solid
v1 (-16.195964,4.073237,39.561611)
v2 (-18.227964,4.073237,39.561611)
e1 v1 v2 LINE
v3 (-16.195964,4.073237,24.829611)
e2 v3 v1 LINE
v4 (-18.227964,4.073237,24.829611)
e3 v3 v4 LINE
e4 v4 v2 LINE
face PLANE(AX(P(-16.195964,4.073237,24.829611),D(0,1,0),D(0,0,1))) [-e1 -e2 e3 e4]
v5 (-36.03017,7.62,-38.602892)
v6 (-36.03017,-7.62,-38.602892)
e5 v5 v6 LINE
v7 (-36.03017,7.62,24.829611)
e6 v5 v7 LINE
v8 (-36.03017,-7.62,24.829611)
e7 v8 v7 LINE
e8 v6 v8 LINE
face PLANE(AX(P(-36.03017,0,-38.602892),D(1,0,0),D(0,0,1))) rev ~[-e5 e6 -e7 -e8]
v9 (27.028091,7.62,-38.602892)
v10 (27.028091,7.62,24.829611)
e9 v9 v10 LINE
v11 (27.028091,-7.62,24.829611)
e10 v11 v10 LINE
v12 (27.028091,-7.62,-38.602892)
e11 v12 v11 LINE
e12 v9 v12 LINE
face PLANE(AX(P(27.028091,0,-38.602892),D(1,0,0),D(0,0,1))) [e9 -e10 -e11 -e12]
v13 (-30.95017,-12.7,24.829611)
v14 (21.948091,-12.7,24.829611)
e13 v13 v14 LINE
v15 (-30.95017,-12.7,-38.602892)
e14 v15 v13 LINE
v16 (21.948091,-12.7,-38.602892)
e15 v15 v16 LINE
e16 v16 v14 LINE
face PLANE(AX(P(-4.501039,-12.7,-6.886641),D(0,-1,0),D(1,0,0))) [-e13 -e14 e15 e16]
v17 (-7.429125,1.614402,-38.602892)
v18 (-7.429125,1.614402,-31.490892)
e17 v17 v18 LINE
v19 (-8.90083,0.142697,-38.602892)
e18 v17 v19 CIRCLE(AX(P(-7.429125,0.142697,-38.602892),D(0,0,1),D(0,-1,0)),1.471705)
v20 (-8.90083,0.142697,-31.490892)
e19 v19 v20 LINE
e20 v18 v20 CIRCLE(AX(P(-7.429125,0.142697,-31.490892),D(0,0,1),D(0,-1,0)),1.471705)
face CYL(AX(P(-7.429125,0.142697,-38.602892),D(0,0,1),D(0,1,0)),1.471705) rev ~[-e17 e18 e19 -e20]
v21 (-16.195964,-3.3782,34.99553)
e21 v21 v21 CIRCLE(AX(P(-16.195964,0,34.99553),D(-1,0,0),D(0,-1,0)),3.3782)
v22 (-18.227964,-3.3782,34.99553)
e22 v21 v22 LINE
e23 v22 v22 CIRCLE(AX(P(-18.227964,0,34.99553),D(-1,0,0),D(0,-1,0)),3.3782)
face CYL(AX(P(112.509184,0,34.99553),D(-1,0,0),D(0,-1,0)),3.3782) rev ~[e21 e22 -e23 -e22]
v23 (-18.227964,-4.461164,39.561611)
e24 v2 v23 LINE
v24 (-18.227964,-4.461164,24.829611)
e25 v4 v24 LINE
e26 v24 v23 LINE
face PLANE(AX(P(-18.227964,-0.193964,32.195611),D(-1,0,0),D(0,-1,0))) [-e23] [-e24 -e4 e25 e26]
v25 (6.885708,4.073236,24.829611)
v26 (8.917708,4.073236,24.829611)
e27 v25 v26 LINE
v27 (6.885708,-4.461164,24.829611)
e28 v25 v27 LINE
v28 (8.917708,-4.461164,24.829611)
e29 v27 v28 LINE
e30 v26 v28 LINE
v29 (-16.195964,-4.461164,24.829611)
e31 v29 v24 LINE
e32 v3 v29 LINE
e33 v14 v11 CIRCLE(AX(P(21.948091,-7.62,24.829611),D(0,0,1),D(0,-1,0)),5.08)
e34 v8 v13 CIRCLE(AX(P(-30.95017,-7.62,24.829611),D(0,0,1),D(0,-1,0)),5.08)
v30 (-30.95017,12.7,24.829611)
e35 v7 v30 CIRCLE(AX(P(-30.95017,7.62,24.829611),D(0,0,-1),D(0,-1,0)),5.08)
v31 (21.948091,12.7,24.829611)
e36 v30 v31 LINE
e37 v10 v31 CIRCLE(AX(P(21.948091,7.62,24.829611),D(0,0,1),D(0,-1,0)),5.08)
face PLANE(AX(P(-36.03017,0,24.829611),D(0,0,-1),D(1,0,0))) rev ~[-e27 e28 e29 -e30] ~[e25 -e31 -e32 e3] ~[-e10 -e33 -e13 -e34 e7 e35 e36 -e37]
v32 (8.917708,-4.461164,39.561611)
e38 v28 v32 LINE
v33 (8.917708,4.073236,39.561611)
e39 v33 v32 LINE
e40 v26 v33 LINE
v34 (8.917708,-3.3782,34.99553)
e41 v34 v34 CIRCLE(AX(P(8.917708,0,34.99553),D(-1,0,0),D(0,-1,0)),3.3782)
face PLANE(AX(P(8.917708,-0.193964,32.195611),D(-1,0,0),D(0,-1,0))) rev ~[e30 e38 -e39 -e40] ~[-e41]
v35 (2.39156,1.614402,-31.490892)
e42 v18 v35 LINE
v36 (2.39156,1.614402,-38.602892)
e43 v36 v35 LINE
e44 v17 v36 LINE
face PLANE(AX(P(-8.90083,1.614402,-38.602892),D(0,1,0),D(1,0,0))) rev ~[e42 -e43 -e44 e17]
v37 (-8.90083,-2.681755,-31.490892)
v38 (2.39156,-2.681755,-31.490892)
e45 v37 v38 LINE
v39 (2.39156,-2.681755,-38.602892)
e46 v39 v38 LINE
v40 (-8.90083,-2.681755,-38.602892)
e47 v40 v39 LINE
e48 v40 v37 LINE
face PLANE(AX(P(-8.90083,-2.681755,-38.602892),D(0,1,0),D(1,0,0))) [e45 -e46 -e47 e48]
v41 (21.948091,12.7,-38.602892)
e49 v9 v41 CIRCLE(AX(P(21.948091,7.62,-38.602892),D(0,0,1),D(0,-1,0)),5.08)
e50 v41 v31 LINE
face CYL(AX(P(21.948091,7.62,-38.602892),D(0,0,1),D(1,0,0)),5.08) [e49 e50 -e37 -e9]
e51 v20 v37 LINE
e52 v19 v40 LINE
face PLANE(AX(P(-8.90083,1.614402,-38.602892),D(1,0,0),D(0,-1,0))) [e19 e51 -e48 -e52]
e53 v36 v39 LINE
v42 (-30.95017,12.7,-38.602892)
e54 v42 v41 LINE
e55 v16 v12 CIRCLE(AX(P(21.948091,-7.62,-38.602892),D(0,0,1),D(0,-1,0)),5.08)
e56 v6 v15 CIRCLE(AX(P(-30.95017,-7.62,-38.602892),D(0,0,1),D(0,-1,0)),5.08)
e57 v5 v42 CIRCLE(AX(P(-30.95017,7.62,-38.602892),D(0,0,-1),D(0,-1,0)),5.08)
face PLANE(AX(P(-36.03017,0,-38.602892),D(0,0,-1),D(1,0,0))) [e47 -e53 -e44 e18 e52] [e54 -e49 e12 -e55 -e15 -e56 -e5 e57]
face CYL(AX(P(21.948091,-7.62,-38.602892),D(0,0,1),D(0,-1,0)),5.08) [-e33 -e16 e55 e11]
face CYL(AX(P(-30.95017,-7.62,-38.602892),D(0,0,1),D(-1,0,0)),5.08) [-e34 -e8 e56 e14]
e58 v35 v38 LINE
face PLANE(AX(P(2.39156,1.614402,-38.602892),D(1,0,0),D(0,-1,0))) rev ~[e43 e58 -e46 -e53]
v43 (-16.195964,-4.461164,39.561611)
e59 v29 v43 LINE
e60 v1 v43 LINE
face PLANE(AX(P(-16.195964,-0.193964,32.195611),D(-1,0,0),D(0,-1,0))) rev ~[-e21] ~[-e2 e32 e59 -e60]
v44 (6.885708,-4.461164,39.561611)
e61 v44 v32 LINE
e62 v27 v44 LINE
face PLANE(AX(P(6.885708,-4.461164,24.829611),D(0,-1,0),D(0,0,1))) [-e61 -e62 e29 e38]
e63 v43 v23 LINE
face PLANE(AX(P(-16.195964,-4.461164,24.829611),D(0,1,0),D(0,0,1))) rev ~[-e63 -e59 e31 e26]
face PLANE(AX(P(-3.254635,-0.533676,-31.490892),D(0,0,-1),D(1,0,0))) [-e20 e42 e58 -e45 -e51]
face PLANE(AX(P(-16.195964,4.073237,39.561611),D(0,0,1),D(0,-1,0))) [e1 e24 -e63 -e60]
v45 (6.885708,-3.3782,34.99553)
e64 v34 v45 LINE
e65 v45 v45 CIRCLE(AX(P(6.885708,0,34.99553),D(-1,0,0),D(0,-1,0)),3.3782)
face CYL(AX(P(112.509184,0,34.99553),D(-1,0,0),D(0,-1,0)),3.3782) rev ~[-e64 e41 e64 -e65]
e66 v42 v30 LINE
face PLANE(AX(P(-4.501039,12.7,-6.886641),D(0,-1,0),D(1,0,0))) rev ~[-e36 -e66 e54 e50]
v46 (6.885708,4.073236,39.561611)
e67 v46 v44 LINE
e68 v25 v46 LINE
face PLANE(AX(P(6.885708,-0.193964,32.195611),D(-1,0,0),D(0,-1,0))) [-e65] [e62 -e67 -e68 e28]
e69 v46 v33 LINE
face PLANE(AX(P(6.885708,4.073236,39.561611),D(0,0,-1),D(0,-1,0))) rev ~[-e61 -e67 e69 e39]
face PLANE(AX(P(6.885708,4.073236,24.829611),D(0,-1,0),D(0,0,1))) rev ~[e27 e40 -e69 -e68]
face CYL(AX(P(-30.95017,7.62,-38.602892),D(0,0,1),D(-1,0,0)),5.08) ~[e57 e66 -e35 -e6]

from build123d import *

# Parameters (mm, degrees)
F0_W      = 63.0582608283
F0_H      = 63.4325034916
F1_DEPTH  = 12.7
F2_R      = 5.08
F4_E1_W   = 8.5344002582
F4_E1_H   = 14.732
F5_DEPTH  = 2.032
F4_E2_W   = 8.5344002582
F4_E2_H   = 14.732
F6_DEPTH  = 2.032
F8_D      = 6.7564
F9_W      = 11.2923893612
F9_H      = 4.2961570434
F10_DEPTH = 7.112
F11_R     = 1.4717045876


with BuildPart() as f1:
    # F0 (on Front) → F1 (new body, symmetric)
    with BuildSketch(Plane.XZ):
        with Locations((-4.5010391623, -6.8866405636)):
            Rectangle(F0_W, F0_H)
    extrude(amount=F1_DEPTH, both=True)

    # F2
    f2_edges = [f1.edges().sort_by_distance(p)[0] for p in [
        (27.028091, -12.7, -6.886641),
        (27.028091, 12.7, -6.886641),
        (-36.03017, 12.7, -6.886641),
        (-36.03017, -12.7, -6.886641),
    ]]
    fillet(f2_edges, radius=F2_R)

    # F4_E1 (on explicit) → F5 (join)
    with BuildSketch(Plane(origin=(-16.1959640682, 4.0732366033, 24.8296111822), x_dir=(0, -1, 0), z_dir=(-1, 0, 0))):
        with Locations((4.2672001291, 7.366)):
            Rectangle(F4_E1_W, F4_E1_H)
    extrude(amount=F5_DEPTH)

    # F4_E2 (on explicit) → F6 (join)
    with BuildSketch(Plane(origin=(6.8857083097, 4.0732364287, 24.8296111822), x_dir=(0, -1, 0), z_dir=(-1, 0, 0))):
        with Locations((4.2672001291, 7.366)):
            Rectangle(F4_E2_W, F4_E2_H)
    extrude(amount=-F6_DEPTH)

    # F8 (through all)
    with Locations(Plane.YZ.offset(8.9177083097)):
        with Locations((0, 34.9955298007)):
            Hole(F8_D / 2)

    # F9 (on face) → F10 (cut)
    with BuildSketch(Plane(origin=(0, 0, -38.6028923094), x_dir=(1, 0, 0), z_dir=(0, 0, -1))):
        with Locations((-3.2546349103, 0.5336764734)):
            Rectangle(F9_W, F9_H)
    extrude(amount=-F10_DEPTH, mode=Mode.SUBTRACT)

    # F11
    f11_edges = [f1.edges().sort_by_distance(p)[0] for p in [
        (-8.90083, 1.614402, -35.046892),
    ]]
    fillet(f11_edges, radius=F11_R)


solid = f1.part
